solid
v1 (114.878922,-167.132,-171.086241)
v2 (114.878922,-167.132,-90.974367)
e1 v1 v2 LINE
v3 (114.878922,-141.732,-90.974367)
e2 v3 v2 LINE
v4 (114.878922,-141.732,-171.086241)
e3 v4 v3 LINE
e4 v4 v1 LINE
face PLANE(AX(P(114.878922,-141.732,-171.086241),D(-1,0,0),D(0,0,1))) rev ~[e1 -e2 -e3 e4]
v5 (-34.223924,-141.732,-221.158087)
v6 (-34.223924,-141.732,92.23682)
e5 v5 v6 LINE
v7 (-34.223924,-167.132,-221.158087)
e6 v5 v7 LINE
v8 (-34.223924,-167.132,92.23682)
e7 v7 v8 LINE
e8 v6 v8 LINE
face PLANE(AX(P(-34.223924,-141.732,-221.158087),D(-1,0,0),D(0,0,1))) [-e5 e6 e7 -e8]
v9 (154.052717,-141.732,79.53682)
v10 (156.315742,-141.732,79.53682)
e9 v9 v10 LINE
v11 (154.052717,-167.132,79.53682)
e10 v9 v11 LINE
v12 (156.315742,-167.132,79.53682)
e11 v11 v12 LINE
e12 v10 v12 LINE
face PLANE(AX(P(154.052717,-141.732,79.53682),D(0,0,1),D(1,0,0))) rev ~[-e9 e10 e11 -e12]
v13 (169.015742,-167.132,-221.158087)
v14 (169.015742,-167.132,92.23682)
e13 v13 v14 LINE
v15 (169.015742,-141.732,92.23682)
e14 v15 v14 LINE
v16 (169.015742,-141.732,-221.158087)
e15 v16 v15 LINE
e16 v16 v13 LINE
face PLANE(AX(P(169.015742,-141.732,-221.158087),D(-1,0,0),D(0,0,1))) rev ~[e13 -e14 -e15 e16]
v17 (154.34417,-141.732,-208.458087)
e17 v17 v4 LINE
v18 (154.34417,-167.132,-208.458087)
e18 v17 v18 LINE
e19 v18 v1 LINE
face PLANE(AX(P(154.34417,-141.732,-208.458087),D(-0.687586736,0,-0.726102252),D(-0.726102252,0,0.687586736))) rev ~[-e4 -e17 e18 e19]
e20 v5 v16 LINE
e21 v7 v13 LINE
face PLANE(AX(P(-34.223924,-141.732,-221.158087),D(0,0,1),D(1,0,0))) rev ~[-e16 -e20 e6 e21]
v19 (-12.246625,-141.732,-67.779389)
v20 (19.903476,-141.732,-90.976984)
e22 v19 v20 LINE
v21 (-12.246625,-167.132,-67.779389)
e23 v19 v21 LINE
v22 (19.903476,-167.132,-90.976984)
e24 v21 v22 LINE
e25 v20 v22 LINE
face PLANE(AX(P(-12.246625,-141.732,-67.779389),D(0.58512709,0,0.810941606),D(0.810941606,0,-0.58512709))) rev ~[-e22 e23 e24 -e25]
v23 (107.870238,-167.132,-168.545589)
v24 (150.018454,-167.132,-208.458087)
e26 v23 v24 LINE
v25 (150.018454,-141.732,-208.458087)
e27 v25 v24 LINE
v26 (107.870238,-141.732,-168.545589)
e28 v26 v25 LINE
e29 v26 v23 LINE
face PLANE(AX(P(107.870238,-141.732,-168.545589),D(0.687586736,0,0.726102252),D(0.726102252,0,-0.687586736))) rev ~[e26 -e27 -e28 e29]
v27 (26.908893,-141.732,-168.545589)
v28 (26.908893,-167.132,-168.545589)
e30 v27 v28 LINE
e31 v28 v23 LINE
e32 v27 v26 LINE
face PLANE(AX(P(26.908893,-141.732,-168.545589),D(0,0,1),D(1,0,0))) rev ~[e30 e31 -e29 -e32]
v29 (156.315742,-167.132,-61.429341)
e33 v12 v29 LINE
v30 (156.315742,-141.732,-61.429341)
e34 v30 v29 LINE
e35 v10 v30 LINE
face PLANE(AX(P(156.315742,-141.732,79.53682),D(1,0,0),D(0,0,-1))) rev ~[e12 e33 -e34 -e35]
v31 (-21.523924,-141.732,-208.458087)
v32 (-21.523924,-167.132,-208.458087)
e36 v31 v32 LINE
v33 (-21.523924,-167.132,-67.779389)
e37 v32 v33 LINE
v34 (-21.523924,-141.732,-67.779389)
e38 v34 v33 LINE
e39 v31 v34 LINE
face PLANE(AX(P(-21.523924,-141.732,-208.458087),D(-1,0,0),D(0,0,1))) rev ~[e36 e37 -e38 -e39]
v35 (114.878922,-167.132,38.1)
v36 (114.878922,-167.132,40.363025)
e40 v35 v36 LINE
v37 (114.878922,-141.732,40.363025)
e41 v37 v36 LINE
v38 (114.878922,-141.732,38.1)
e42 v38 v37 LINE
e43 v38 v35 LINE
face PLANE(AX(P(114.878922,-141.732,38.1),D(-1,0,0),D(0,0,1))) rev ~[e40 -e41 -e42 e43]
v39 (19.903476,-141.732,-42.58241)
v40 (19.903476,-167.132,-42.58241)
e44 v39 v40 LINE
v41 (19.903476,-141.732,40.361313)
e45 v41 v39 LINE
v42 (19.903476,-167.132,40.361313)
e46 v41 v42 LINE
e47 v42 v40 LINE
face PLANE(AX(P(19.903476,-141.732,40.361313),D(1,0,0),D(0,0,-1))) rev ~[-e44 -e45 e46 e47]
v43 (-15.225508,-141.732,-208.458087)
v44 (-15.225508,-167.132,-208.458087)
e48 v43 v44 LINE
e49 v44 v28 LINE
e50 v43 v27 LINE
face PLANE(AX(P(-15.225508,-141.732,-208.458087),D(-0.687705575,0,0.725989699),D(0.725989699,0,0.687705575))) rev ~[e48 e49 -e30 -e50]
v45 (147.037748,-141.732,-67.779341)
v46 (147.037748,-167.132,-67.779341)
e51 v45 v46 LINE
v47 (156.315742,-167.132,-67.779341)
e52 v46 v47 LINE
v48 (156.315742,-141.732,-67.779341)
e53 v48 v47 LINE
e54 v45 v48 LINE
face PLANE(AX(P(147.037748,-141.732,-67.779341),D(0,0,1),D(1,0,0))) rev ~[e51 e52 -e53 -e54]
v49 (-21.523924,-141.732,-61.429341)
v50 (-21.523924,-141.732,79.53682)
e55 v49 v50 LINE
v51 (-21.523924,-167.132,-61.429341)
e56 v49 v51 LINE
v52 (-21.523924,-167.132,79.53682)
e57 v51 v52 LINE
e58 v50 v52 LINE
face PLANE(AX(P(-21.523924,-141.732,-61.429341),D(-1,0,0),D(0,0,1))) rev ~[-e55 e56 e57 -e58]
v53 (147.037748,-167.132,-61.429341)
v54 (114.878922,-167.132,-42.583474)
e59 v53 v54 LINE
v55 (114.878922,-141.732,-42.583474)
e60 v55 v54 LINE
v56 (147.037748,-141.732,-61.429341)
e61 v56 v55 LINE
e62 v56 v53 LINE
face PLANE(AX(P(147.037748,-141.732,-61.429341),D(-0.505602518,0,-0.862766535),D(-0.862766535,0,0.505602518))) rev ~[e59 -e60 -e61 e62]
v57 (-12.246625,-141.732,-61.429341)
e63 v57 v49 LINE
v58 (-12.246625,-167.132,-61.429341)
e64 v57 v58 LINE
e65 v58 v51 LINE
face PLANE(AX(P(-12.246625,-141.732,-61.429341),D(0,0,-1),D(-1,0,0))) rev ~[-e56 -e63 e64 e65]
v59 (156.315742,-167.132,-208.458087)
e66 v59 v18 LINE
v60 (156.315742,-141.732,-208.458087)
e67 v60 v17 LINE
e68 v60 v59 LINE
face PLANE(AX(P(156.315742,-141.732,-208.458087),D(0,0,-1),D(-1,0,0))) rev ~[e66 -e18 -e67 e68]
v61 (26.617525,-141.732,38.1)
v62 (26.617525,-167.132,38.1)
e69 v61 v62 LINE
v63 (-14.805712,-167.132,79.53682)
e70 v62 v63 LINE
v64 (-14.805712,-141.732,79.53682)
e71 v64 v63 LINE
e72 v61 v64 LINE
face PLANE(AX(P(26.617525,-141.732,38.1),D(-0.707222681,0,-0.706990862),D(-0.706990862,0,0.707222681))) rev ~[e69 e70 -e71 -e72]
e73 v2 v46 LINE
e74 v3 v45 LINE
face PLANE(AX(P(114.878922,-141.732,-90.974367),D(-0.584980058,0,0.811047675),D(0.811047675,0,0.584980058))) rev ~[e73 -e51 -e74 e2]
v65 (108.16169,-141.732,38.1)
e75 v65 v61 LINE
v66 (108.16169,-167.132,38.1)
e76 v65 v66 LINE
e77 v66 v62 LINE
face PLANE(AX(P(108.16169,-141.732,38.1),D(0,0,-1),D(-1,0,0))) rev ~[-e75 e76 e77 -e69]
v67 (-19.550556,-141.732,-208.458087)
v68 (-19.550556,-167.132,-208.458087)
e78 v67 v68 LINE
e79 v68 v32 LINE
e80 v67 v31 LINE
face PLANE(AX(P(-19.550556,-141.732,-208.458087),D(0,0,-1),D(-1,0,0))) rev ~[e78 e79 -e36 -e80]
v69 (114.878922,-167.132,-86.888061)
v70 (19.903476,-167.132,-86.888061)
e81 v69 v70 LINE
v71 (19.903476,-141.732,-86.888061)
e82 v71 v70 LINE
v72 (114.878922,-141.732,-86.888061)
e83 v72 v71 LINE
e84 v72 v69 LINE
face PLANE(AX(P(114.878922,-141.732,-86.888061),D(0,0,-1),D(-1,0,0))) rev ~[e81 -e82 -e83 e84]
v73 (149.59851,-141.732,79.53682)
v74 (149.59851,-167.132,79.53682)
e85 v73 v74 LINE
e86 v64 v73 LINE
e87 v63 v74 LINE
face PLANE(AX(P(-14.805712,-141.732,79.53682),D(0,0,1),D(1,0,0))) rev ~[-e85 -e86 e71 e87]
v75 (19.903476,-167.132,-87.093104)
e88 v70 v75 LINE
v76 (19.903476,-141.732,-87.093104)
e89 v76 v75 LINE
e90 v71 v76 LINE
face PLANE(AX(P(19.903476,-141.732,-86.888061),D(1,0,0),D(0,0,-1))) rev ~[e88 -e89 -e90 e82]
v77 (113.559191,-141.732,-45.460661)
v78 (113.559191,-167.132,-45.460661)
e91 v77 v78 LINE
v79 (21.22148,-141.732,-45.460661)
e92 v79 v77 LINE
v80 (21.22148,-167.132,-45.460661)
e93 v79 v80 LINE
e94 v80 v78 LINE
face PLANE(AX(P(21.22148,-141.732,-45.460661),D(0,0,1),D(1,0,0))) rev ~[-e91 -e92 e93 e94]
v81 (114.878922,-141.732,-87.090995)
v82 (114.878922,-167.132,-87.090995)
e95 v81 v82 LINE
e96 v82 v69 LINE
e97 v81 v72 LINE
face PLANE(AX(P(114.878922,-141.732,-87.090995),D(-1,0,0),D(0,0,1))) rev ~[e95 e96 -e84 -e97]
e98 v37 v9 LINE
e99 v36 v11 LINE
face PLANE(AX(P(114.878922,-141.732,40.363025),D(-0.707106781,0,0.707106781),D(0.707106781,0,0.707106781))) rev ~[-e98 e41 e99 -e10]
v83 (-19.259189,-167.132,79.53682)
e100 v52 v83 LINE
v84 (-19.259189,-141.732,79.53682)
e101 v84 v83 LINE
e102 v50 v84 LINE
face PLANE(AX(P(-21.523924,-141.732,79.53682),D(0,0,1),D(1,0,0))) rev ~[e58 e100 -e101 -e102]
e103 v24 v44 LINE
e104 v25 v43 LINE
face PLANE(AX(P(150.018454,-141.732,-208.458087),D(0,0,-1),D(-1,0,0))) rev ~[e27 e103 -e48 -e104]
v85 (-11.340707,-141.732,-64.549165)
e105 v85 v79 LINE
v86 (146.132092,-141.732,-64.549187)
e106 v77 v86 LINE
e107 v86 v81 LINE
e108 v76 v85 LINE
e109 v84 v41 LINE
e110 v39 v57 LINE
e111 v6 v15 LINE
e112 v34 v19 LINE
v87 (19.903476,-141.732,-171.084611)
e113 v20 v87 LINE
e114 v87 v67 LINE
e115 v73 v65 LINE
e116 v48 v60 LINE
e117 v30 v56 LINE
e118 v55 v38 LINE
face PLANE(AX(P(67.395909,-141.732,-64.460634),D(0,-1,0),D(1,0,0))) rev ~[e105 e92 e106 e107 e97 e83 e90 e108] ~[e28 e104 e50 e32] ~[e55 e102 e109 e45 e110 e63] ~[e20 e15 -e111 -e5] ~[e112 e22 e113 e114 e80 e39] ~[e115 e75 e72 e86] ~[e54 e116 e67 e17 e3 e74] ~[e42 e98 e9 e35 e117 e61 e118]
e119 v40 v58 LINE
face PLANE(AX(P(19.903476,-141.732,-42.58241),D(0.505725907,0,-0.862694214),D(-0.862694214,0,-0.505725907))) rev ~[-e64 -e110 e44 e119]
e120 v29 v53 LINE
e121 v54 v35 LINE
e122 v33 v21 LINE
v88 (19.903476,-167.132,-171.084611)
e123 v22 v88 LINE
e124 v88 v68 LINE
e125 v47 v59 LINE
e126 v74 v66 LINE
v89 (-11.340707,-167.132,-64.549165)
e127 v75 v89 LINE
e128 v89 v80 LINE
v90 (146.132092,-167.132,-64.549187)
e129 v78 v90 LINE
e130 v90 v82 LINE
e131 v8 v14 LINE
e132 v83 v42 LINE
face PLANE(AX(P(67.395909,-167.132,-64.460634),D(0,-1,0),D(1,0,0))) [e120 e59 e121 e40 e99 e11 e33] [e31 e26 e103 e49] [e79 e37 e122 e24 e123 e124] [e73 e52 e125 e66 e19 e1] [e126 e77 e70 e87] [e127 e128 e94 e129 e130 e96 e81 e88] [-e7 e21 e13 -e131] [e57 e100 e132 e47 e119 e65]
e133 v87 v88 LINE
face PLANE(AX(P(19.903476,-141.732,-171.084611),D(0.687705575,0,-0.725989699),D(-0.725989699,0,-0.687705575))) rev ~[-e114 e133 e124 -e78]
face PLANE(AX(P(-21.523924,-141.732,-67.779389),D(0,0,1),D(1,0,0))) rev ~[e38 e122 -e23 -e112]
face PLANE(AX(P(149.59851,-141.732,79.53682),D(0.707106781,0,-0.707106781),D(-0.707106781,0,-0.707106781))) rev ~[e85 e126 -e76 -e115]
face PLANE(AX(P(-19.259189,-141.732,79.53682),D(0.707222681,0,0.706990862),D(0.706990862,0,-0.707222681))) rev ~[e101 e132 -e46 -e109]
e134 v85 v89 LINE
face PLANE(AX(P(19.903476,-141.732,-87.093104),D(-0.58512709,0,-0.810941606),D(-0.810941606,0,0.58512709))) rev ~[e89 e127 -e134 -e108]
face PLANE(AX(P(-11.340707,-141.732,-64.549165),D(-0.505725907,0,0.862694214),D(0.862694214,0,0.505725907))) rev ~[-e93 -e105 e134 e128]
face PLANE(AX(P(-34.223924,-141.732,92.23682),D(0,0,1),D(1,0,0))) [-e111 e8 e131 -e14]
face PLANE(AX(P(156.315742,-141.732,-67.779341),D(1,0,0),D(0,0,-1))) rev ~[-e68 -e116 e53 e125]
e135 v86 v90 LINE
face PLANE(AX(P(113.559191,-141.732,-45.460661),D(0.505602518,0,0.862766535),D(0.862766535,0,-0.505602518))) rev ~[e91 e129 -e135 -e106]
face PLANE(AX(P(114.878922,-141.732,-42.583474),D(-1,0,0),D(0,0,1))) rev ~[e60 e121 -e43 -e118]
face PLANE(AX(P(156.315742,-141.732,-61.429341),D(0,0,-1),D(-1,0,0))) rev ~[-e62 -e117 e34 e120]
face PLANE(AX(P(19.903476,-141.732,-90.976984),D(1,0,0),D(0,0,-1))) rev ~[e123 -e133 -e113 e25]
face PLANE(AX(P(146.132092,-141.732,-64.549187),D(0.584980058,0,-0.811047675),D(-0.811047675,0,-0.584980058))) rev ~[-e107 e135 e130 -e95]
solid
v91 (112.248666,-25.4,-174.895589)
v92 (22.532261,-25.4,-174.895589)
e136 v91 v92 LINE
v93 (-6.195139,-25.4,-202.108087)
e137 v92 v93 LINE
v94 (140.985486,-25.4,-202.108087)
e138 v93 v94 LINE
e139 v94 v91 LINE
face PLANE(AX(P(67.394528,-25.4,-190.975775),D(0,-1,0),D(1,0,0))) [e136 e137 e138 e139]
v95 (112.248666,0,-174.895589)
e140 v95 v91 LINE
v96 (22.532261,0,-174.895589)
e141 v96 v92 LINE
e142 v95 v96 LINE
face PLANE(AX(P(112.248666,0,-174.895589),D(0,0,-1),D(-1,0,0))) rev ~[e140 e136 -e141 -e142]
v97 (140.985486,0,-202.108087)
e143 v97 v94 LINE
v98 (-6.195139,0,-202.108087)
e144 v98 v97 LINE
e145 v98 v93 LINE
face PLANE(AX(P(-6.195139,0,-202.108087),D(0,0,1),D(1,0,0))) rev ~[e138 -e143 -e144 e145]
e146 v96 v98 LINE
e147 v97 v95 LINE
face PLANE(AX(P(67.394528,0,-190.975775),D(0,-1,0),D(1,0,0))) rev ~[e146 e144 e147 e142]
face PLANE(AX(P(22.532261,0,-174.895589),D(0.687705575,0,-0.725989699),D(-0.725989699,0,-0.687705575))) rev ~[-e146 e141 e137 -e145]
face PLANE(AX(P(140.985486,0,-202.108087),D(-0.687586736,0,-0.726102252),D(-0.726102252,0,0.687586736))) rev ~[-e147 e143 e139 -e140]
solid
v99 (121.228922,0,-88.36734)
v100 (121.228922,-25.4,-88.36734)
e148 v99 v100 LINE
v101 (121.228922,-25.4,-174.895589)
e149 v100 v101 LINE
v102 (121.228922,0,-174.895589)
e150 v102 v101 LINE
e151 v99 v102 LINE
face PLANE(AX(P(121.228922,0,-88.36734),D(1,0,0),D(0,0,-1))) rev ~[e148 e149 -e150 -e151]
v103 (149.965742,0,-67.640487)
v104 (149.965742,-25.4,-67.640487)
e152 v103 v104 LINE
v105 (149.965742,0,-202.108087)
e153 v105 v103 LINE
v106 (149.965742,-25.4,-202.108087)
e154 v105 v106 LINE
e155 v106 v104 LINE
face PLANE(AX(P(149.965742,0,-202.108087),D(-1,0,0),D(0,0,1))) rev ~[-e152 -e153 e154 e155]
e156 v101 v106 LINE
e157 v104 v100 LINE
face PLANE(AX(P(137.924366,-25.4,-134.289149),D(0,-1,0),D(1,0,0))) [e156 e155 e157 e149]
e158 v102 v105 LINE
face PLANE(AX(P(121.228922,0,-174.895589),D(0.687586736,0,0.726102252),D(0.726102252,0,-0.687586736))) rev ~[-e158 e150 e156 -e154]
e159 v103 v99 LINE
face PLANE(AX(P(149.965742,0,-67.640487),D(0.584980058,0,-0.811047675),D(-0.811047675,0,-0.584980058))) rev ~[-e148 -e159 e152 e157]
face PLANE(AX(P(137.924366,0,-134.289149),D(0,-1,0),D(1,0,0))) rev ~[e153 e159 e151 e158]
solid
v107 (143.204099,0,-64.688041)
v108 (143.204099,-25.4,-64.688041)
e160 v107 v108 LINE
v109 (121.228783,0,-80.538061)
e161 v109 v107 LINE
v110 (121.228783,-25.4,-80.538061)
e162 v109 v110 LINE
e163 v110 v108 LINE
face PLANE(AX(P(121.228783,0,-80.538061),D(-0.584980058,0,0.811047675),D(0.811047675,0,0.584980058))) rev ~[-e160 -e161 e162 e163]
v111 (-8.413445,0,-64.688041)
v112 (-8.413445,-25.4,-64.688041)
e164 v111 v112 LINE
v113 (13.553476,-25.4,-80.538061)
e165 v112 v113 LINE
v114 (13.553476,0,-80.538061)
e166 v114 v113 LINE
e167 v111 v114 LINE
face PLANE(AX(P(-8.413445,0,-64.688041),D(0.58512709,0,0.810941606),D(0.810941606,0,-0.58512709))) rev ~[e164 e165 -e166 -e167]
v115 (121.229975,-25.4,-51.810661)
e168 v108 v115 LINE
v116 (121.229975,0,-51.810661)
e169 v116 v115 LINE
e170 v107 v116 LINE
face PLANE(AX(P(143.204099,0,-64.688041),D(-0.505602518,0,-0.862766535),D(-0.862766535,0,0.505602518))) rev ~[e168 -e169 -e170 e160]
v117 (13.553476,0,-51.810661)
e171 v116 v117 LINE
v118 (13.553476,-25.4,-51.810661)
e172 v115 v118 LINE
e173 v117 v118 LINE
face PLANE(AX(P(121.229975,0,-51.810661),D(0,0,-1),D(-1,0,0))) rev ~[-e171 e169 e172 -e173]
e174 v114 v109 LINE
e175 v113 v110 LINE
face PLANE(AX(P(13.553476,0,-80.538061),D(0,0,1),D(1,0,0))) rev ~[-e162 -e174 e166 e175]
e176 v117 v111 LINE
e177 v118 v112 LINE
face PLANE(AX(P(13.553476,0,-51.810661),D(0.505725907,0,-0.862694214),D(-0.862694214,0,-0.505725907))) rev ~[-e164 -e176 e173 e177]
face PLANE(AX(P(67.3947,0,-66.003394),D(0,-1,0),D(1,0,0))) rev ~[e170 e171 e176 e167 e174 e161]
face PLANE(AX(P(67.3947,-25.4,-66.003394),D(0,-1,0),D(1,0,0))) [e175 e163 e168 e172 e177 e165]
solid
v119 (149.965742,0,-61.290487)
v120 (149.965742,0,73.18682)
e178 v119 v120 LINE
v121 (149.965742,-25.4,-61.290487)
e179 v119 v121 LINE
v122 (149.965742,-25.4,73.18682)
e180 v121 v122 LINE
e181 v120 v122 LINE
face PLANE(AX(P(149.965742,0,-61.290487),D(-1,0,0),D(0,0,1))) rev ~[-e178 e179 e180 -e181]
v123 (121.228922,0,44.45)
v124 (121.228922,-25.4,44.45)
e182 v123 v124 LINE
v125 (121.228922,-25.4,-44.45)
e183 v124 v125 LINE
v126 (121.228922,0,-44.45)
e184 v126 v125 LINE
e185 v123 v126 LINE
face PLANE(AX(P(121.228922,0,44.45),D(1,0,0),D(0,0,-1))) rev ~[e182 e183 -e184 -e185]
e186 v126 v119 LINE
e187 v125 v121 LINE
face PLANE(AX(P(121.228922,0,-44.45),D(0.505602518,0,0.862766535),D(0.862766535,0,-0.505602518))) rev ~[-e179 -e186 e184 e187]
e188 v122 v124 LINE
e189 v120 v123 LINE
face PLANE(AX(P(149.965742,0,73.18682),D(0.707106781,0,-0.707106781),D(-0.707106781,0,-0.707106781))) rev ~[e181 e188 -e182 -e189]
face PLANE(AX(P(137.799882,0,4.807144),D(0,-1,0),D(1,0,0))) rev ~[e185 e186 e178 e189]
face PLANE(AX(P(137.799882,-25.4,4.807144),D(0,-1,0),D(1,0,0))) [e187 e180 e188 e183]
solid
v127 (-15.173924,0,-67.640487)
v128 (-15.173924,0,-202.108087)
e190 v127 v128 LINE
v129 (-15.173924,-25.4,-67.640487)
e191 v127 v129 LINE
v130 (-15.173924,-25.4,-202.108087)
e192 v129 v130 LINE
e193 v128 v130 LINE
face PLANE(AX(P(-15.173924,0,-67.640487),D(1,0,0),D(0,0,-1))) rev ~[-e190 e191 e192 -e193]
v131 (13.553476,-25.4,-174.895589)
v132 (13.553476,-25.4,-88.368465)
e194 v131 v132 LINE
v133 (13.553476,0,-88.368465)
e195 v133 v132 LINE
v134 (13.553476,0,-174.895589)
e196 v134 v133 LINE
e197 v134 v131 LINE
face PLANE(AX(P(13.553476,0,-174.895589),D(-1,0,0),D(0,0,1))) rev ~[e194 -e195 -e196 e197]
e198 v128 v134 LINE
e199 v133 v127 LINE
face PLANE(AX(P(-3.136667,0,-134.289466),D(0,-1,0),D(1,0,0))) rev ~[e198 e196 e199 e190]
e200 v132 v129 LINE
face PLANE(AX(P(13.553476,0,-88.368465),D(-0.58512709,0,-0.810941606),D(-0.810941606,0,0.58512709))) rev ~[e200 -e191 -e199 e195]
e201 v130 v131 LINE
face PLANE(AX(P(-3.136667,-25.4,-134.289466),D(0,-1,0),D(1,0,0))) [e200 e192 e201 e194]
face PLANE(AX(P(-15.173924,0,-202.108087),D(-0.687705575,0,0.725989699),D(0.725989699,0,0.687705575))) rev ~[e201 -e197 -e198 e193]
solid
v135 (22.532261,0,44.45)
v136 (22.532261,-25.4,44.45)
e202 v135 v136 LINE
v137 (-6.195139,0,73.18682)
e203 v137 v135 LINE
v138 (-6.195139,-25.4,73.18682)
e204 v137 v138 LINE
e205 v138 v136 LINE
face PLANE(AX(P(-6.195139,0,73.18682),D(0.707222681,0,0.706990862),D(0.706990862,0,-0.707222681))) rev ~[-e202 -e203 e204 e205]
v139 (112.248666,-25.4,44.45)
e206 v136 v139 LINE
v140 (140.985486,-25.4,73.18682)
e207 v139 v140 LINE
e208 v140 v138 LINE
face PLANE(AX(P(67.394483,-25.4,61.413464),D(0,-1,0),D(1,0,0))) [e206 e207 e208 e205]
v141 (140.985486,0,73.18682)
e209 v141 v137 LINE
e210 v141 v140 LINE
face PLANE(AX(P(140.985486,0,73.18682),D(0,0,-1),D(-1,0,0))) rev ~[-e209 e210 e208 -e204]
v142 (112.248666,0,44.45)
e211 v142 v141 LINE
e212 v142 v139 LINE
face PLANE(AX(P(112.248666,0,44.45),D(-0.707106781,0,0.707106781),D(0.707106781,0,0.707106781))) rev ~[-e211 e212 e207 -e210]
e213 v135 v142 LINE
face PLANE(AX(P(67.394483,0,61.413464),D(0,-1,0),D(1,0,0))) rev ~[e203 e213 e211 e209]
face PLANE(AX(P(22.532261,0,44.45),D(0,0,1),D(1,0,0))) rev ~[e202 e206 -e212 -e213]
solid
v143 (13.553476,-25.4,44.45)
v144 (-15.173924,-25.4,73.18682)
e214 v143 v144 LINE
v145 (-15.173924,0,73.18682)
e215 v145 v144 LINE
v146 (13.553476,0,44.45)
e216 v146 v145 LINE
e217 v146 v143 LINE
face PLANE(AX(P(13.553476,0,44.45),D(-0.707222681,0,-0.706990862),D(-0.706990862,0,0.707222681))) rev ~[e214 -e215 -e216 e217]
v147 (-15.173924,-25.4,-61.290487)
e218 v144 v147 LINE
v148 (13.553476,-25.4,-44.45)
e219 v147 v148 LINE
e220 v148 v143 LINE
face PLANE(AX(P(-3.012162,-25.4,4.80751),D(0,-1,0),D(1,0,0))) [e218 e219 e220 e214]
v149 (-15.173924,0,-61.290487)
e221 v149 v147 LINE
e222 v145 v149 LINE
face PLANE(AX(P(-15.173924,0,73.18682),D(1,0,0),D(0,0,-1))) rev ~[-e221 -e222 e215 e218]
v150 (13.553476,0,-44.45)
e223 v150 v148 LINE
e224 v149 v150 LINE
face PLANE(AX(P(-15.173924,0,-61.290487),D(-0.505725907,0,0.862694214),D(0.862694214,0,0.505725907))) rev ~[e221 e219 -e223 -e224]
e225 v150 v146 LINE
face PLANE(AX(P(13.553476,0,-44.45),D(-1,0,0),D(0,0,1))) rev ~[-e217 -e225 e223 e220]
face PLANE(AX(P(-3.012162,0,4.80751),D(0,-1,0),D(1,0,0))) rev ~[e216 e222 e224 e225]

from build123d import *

# Parameters (mm, degrees)
F1_DEPTH = 25.4
F3_W     = 203.2396654825
F3_H     = 313.3949062689
F4_DEPTH = 25.4


# Not quite as in the source:
# - a feature names something its author has since deleted; it is built from what else it names


with BuildPart() as f1:
    # F0 (on Front) → F1 (new body)
    with BuildSketch(Plane.XZ):
        Polygon((-15.1739238592, -61.2904866815), (13.5534761408, -44.45), (13.5534761408, 44.45), (-15.1739238592, 73.1868195874), align=None)
    extrude(amount=F1_DEPTH)


with BuildPart() as f1b:
    # F0 (on Front) → F1, piece 2 (new body)
    with BuildSketch(Plane.XZ):
        Polygon((140.9854855022, 73.1868195874), (-6.195139428, 73.1868195874), (22.532260572, 44.45), (112.2486659148, 44.45), align=None)
    extrude(amount=F1_DEPTH)


with BuildPart() as f1c:
    # F0 (on Front) → F1, piece 3 (new body)
    with BuildSketch(Plane.XZ):
        Polygon((149.9657416234, -61.2904866815), (149.9657416233, 73.1868195874), (121.2289220359, 44.45), (121.228922036, -44.45), align=None)
    extrude(amount=F1_DEPTH)


with BuildPart() as f1d:
    # F0 (on Front) → F1, piece 4 (new body)
    with BuildSketch(Plane.XZ):
        Polygon((121.228922036, -174.8955888238), (149.9657416234, -202.1080866815), (149.9657416234, -67.6404866815), (121.228922036, -88.3673402517), align=None)
    extrude(amount=F1_DEPTH)


with BuildPart() as f1e:
    # F0 (on Front) → F1, piece 5 (new body)
    with BuildSketch(Plane.XZ):
        Polygon((13.5534761408, -88.368464908), (-15.1739238592, -67.6404866815), (-15.1739238592, -202.1080866815), (13.5534761408, -174.8955888238), align=None)
    extrude(amount=F1_DEPTH)


with BuildPart() as f1f:
    # F0 (on Front) → F1, piece 6 (new body)
    with BuildSketch(Plane.XZ):
        Polygon((22.532260572, -174.8955888238), (-6.195139428, -202.1080866815), (140.9854855022, -202.1080866815), (112.2486659148, -174.8955888238), align=None)
    extrude(amount=F1_DEPTH)


with BuildPart() as f1g:
    # F0 (on Front) → F1, piece 7 (new body)
    with BuildSketch(Plane.XZ):
        Polygon((13.5534761408, -51.8106613985), (-8.4134451263, -64.6880413574), (13.5534761408, -80.5380613985), (121.2287825639, -80.5380613985), (143.2040990216, -64.6880413574), (121.2299748981, -51.8106613985), align=None)
    extrude(amount=F1_DEPTH)


with BuildPart() as f4:
    # F3 (on offset) → F4 (new body)
    with BuildSketch(Plane.XZ.offset(141.732)):
        with Locations((67.3959088821, -64.460633547)):
            Rectangle(F3_W, F3_H)
        Polygon((-21.5239238592, 79.5368195874), (-19.2591887281, 79.5368195874), (-14.8057116502, 79.5368195874), (149.5985100447, 79.5368195874), (154.0527170808, 79.5368195874), (156.3157416234, 79.5368195874), (156.3157416234, -61.4293413488), (156.3157416234, -67.7793413488), (156.3157416234, -208.4580866815), (154.3441700366, -208.4580866815), (150.0184539651, -208.4580866815), (-15.22550768, -208.4580866815), (-19.550556387, -208.4580866815), (-21.5239238592, -208.4580866815), (-21.5239238592, -67.7793892541), (-21.5239238592, -61.4293413488), align=None, mode=Mode.SUBTRACT)
        Polygon((19.9034761408, 40.3613134539), (19.9034761408, 38.1), (19.9034761408, -42.5824095103), (-12.2466249778, -61.4293413488), (-21.5239238592, -61.4293413488), (-21.5239238592, -67.7793892541), (-12.2466249778, -67.7793892541), (19.9034761408, -90.9769844408), (19.9034761408, -168.5455888238), (19.9034761408, -171.0846113359), (-19.550556387, -208.4580866815), (-15.22550768, -208.4580866815), (26.9088930999, -168.5455888237), (107.8702375016, -168.5455888238), (150.0184539651, -208.4580866815), (154.3441700366, -208.4580866815), (114.878922036, -171.0862413594), (114.878922036, -168.5455888238), (114.878922036, -90.974367478), (147.0377482149, -67.7793413488), (156.3157416234, -67.7793413488), (156.3157416234, -61.4293413488), (147.0377482149, -61.4293413488), (114.878922036, -42.5834742092), (114.878922036, 38.1), (114.8789220359, 40.3630245425), (154.0527170808, 79.5368195874), (149.5985100447, 79.5368195874), (108.1616904574, 38.1), (26.617525441, 38.1), (-14.8057116502, 79.5368195874), (-19.2591887281, 79.5368195874), align=None)
        Polygon((-11.340707376, -64.549165216), (21.2214801035, -45.4606613985), (113.5591913096, -45.4606613985), (146.13209243, -64.5491866901), (114.878922036, -87.090995271), (114.878922036, -86.8880613985), (19.9034761408, -86.8880613985), (19.9034761408, -87.0931043), align=None, mode=Mode.SUBTRACT)
    extrude(amount=F4_DEPTH)


solid = Compound([f1.part, f1b.part, f1c.part, f1d.part, f1e.part, f1f.part, f1g.part, f4.part])
